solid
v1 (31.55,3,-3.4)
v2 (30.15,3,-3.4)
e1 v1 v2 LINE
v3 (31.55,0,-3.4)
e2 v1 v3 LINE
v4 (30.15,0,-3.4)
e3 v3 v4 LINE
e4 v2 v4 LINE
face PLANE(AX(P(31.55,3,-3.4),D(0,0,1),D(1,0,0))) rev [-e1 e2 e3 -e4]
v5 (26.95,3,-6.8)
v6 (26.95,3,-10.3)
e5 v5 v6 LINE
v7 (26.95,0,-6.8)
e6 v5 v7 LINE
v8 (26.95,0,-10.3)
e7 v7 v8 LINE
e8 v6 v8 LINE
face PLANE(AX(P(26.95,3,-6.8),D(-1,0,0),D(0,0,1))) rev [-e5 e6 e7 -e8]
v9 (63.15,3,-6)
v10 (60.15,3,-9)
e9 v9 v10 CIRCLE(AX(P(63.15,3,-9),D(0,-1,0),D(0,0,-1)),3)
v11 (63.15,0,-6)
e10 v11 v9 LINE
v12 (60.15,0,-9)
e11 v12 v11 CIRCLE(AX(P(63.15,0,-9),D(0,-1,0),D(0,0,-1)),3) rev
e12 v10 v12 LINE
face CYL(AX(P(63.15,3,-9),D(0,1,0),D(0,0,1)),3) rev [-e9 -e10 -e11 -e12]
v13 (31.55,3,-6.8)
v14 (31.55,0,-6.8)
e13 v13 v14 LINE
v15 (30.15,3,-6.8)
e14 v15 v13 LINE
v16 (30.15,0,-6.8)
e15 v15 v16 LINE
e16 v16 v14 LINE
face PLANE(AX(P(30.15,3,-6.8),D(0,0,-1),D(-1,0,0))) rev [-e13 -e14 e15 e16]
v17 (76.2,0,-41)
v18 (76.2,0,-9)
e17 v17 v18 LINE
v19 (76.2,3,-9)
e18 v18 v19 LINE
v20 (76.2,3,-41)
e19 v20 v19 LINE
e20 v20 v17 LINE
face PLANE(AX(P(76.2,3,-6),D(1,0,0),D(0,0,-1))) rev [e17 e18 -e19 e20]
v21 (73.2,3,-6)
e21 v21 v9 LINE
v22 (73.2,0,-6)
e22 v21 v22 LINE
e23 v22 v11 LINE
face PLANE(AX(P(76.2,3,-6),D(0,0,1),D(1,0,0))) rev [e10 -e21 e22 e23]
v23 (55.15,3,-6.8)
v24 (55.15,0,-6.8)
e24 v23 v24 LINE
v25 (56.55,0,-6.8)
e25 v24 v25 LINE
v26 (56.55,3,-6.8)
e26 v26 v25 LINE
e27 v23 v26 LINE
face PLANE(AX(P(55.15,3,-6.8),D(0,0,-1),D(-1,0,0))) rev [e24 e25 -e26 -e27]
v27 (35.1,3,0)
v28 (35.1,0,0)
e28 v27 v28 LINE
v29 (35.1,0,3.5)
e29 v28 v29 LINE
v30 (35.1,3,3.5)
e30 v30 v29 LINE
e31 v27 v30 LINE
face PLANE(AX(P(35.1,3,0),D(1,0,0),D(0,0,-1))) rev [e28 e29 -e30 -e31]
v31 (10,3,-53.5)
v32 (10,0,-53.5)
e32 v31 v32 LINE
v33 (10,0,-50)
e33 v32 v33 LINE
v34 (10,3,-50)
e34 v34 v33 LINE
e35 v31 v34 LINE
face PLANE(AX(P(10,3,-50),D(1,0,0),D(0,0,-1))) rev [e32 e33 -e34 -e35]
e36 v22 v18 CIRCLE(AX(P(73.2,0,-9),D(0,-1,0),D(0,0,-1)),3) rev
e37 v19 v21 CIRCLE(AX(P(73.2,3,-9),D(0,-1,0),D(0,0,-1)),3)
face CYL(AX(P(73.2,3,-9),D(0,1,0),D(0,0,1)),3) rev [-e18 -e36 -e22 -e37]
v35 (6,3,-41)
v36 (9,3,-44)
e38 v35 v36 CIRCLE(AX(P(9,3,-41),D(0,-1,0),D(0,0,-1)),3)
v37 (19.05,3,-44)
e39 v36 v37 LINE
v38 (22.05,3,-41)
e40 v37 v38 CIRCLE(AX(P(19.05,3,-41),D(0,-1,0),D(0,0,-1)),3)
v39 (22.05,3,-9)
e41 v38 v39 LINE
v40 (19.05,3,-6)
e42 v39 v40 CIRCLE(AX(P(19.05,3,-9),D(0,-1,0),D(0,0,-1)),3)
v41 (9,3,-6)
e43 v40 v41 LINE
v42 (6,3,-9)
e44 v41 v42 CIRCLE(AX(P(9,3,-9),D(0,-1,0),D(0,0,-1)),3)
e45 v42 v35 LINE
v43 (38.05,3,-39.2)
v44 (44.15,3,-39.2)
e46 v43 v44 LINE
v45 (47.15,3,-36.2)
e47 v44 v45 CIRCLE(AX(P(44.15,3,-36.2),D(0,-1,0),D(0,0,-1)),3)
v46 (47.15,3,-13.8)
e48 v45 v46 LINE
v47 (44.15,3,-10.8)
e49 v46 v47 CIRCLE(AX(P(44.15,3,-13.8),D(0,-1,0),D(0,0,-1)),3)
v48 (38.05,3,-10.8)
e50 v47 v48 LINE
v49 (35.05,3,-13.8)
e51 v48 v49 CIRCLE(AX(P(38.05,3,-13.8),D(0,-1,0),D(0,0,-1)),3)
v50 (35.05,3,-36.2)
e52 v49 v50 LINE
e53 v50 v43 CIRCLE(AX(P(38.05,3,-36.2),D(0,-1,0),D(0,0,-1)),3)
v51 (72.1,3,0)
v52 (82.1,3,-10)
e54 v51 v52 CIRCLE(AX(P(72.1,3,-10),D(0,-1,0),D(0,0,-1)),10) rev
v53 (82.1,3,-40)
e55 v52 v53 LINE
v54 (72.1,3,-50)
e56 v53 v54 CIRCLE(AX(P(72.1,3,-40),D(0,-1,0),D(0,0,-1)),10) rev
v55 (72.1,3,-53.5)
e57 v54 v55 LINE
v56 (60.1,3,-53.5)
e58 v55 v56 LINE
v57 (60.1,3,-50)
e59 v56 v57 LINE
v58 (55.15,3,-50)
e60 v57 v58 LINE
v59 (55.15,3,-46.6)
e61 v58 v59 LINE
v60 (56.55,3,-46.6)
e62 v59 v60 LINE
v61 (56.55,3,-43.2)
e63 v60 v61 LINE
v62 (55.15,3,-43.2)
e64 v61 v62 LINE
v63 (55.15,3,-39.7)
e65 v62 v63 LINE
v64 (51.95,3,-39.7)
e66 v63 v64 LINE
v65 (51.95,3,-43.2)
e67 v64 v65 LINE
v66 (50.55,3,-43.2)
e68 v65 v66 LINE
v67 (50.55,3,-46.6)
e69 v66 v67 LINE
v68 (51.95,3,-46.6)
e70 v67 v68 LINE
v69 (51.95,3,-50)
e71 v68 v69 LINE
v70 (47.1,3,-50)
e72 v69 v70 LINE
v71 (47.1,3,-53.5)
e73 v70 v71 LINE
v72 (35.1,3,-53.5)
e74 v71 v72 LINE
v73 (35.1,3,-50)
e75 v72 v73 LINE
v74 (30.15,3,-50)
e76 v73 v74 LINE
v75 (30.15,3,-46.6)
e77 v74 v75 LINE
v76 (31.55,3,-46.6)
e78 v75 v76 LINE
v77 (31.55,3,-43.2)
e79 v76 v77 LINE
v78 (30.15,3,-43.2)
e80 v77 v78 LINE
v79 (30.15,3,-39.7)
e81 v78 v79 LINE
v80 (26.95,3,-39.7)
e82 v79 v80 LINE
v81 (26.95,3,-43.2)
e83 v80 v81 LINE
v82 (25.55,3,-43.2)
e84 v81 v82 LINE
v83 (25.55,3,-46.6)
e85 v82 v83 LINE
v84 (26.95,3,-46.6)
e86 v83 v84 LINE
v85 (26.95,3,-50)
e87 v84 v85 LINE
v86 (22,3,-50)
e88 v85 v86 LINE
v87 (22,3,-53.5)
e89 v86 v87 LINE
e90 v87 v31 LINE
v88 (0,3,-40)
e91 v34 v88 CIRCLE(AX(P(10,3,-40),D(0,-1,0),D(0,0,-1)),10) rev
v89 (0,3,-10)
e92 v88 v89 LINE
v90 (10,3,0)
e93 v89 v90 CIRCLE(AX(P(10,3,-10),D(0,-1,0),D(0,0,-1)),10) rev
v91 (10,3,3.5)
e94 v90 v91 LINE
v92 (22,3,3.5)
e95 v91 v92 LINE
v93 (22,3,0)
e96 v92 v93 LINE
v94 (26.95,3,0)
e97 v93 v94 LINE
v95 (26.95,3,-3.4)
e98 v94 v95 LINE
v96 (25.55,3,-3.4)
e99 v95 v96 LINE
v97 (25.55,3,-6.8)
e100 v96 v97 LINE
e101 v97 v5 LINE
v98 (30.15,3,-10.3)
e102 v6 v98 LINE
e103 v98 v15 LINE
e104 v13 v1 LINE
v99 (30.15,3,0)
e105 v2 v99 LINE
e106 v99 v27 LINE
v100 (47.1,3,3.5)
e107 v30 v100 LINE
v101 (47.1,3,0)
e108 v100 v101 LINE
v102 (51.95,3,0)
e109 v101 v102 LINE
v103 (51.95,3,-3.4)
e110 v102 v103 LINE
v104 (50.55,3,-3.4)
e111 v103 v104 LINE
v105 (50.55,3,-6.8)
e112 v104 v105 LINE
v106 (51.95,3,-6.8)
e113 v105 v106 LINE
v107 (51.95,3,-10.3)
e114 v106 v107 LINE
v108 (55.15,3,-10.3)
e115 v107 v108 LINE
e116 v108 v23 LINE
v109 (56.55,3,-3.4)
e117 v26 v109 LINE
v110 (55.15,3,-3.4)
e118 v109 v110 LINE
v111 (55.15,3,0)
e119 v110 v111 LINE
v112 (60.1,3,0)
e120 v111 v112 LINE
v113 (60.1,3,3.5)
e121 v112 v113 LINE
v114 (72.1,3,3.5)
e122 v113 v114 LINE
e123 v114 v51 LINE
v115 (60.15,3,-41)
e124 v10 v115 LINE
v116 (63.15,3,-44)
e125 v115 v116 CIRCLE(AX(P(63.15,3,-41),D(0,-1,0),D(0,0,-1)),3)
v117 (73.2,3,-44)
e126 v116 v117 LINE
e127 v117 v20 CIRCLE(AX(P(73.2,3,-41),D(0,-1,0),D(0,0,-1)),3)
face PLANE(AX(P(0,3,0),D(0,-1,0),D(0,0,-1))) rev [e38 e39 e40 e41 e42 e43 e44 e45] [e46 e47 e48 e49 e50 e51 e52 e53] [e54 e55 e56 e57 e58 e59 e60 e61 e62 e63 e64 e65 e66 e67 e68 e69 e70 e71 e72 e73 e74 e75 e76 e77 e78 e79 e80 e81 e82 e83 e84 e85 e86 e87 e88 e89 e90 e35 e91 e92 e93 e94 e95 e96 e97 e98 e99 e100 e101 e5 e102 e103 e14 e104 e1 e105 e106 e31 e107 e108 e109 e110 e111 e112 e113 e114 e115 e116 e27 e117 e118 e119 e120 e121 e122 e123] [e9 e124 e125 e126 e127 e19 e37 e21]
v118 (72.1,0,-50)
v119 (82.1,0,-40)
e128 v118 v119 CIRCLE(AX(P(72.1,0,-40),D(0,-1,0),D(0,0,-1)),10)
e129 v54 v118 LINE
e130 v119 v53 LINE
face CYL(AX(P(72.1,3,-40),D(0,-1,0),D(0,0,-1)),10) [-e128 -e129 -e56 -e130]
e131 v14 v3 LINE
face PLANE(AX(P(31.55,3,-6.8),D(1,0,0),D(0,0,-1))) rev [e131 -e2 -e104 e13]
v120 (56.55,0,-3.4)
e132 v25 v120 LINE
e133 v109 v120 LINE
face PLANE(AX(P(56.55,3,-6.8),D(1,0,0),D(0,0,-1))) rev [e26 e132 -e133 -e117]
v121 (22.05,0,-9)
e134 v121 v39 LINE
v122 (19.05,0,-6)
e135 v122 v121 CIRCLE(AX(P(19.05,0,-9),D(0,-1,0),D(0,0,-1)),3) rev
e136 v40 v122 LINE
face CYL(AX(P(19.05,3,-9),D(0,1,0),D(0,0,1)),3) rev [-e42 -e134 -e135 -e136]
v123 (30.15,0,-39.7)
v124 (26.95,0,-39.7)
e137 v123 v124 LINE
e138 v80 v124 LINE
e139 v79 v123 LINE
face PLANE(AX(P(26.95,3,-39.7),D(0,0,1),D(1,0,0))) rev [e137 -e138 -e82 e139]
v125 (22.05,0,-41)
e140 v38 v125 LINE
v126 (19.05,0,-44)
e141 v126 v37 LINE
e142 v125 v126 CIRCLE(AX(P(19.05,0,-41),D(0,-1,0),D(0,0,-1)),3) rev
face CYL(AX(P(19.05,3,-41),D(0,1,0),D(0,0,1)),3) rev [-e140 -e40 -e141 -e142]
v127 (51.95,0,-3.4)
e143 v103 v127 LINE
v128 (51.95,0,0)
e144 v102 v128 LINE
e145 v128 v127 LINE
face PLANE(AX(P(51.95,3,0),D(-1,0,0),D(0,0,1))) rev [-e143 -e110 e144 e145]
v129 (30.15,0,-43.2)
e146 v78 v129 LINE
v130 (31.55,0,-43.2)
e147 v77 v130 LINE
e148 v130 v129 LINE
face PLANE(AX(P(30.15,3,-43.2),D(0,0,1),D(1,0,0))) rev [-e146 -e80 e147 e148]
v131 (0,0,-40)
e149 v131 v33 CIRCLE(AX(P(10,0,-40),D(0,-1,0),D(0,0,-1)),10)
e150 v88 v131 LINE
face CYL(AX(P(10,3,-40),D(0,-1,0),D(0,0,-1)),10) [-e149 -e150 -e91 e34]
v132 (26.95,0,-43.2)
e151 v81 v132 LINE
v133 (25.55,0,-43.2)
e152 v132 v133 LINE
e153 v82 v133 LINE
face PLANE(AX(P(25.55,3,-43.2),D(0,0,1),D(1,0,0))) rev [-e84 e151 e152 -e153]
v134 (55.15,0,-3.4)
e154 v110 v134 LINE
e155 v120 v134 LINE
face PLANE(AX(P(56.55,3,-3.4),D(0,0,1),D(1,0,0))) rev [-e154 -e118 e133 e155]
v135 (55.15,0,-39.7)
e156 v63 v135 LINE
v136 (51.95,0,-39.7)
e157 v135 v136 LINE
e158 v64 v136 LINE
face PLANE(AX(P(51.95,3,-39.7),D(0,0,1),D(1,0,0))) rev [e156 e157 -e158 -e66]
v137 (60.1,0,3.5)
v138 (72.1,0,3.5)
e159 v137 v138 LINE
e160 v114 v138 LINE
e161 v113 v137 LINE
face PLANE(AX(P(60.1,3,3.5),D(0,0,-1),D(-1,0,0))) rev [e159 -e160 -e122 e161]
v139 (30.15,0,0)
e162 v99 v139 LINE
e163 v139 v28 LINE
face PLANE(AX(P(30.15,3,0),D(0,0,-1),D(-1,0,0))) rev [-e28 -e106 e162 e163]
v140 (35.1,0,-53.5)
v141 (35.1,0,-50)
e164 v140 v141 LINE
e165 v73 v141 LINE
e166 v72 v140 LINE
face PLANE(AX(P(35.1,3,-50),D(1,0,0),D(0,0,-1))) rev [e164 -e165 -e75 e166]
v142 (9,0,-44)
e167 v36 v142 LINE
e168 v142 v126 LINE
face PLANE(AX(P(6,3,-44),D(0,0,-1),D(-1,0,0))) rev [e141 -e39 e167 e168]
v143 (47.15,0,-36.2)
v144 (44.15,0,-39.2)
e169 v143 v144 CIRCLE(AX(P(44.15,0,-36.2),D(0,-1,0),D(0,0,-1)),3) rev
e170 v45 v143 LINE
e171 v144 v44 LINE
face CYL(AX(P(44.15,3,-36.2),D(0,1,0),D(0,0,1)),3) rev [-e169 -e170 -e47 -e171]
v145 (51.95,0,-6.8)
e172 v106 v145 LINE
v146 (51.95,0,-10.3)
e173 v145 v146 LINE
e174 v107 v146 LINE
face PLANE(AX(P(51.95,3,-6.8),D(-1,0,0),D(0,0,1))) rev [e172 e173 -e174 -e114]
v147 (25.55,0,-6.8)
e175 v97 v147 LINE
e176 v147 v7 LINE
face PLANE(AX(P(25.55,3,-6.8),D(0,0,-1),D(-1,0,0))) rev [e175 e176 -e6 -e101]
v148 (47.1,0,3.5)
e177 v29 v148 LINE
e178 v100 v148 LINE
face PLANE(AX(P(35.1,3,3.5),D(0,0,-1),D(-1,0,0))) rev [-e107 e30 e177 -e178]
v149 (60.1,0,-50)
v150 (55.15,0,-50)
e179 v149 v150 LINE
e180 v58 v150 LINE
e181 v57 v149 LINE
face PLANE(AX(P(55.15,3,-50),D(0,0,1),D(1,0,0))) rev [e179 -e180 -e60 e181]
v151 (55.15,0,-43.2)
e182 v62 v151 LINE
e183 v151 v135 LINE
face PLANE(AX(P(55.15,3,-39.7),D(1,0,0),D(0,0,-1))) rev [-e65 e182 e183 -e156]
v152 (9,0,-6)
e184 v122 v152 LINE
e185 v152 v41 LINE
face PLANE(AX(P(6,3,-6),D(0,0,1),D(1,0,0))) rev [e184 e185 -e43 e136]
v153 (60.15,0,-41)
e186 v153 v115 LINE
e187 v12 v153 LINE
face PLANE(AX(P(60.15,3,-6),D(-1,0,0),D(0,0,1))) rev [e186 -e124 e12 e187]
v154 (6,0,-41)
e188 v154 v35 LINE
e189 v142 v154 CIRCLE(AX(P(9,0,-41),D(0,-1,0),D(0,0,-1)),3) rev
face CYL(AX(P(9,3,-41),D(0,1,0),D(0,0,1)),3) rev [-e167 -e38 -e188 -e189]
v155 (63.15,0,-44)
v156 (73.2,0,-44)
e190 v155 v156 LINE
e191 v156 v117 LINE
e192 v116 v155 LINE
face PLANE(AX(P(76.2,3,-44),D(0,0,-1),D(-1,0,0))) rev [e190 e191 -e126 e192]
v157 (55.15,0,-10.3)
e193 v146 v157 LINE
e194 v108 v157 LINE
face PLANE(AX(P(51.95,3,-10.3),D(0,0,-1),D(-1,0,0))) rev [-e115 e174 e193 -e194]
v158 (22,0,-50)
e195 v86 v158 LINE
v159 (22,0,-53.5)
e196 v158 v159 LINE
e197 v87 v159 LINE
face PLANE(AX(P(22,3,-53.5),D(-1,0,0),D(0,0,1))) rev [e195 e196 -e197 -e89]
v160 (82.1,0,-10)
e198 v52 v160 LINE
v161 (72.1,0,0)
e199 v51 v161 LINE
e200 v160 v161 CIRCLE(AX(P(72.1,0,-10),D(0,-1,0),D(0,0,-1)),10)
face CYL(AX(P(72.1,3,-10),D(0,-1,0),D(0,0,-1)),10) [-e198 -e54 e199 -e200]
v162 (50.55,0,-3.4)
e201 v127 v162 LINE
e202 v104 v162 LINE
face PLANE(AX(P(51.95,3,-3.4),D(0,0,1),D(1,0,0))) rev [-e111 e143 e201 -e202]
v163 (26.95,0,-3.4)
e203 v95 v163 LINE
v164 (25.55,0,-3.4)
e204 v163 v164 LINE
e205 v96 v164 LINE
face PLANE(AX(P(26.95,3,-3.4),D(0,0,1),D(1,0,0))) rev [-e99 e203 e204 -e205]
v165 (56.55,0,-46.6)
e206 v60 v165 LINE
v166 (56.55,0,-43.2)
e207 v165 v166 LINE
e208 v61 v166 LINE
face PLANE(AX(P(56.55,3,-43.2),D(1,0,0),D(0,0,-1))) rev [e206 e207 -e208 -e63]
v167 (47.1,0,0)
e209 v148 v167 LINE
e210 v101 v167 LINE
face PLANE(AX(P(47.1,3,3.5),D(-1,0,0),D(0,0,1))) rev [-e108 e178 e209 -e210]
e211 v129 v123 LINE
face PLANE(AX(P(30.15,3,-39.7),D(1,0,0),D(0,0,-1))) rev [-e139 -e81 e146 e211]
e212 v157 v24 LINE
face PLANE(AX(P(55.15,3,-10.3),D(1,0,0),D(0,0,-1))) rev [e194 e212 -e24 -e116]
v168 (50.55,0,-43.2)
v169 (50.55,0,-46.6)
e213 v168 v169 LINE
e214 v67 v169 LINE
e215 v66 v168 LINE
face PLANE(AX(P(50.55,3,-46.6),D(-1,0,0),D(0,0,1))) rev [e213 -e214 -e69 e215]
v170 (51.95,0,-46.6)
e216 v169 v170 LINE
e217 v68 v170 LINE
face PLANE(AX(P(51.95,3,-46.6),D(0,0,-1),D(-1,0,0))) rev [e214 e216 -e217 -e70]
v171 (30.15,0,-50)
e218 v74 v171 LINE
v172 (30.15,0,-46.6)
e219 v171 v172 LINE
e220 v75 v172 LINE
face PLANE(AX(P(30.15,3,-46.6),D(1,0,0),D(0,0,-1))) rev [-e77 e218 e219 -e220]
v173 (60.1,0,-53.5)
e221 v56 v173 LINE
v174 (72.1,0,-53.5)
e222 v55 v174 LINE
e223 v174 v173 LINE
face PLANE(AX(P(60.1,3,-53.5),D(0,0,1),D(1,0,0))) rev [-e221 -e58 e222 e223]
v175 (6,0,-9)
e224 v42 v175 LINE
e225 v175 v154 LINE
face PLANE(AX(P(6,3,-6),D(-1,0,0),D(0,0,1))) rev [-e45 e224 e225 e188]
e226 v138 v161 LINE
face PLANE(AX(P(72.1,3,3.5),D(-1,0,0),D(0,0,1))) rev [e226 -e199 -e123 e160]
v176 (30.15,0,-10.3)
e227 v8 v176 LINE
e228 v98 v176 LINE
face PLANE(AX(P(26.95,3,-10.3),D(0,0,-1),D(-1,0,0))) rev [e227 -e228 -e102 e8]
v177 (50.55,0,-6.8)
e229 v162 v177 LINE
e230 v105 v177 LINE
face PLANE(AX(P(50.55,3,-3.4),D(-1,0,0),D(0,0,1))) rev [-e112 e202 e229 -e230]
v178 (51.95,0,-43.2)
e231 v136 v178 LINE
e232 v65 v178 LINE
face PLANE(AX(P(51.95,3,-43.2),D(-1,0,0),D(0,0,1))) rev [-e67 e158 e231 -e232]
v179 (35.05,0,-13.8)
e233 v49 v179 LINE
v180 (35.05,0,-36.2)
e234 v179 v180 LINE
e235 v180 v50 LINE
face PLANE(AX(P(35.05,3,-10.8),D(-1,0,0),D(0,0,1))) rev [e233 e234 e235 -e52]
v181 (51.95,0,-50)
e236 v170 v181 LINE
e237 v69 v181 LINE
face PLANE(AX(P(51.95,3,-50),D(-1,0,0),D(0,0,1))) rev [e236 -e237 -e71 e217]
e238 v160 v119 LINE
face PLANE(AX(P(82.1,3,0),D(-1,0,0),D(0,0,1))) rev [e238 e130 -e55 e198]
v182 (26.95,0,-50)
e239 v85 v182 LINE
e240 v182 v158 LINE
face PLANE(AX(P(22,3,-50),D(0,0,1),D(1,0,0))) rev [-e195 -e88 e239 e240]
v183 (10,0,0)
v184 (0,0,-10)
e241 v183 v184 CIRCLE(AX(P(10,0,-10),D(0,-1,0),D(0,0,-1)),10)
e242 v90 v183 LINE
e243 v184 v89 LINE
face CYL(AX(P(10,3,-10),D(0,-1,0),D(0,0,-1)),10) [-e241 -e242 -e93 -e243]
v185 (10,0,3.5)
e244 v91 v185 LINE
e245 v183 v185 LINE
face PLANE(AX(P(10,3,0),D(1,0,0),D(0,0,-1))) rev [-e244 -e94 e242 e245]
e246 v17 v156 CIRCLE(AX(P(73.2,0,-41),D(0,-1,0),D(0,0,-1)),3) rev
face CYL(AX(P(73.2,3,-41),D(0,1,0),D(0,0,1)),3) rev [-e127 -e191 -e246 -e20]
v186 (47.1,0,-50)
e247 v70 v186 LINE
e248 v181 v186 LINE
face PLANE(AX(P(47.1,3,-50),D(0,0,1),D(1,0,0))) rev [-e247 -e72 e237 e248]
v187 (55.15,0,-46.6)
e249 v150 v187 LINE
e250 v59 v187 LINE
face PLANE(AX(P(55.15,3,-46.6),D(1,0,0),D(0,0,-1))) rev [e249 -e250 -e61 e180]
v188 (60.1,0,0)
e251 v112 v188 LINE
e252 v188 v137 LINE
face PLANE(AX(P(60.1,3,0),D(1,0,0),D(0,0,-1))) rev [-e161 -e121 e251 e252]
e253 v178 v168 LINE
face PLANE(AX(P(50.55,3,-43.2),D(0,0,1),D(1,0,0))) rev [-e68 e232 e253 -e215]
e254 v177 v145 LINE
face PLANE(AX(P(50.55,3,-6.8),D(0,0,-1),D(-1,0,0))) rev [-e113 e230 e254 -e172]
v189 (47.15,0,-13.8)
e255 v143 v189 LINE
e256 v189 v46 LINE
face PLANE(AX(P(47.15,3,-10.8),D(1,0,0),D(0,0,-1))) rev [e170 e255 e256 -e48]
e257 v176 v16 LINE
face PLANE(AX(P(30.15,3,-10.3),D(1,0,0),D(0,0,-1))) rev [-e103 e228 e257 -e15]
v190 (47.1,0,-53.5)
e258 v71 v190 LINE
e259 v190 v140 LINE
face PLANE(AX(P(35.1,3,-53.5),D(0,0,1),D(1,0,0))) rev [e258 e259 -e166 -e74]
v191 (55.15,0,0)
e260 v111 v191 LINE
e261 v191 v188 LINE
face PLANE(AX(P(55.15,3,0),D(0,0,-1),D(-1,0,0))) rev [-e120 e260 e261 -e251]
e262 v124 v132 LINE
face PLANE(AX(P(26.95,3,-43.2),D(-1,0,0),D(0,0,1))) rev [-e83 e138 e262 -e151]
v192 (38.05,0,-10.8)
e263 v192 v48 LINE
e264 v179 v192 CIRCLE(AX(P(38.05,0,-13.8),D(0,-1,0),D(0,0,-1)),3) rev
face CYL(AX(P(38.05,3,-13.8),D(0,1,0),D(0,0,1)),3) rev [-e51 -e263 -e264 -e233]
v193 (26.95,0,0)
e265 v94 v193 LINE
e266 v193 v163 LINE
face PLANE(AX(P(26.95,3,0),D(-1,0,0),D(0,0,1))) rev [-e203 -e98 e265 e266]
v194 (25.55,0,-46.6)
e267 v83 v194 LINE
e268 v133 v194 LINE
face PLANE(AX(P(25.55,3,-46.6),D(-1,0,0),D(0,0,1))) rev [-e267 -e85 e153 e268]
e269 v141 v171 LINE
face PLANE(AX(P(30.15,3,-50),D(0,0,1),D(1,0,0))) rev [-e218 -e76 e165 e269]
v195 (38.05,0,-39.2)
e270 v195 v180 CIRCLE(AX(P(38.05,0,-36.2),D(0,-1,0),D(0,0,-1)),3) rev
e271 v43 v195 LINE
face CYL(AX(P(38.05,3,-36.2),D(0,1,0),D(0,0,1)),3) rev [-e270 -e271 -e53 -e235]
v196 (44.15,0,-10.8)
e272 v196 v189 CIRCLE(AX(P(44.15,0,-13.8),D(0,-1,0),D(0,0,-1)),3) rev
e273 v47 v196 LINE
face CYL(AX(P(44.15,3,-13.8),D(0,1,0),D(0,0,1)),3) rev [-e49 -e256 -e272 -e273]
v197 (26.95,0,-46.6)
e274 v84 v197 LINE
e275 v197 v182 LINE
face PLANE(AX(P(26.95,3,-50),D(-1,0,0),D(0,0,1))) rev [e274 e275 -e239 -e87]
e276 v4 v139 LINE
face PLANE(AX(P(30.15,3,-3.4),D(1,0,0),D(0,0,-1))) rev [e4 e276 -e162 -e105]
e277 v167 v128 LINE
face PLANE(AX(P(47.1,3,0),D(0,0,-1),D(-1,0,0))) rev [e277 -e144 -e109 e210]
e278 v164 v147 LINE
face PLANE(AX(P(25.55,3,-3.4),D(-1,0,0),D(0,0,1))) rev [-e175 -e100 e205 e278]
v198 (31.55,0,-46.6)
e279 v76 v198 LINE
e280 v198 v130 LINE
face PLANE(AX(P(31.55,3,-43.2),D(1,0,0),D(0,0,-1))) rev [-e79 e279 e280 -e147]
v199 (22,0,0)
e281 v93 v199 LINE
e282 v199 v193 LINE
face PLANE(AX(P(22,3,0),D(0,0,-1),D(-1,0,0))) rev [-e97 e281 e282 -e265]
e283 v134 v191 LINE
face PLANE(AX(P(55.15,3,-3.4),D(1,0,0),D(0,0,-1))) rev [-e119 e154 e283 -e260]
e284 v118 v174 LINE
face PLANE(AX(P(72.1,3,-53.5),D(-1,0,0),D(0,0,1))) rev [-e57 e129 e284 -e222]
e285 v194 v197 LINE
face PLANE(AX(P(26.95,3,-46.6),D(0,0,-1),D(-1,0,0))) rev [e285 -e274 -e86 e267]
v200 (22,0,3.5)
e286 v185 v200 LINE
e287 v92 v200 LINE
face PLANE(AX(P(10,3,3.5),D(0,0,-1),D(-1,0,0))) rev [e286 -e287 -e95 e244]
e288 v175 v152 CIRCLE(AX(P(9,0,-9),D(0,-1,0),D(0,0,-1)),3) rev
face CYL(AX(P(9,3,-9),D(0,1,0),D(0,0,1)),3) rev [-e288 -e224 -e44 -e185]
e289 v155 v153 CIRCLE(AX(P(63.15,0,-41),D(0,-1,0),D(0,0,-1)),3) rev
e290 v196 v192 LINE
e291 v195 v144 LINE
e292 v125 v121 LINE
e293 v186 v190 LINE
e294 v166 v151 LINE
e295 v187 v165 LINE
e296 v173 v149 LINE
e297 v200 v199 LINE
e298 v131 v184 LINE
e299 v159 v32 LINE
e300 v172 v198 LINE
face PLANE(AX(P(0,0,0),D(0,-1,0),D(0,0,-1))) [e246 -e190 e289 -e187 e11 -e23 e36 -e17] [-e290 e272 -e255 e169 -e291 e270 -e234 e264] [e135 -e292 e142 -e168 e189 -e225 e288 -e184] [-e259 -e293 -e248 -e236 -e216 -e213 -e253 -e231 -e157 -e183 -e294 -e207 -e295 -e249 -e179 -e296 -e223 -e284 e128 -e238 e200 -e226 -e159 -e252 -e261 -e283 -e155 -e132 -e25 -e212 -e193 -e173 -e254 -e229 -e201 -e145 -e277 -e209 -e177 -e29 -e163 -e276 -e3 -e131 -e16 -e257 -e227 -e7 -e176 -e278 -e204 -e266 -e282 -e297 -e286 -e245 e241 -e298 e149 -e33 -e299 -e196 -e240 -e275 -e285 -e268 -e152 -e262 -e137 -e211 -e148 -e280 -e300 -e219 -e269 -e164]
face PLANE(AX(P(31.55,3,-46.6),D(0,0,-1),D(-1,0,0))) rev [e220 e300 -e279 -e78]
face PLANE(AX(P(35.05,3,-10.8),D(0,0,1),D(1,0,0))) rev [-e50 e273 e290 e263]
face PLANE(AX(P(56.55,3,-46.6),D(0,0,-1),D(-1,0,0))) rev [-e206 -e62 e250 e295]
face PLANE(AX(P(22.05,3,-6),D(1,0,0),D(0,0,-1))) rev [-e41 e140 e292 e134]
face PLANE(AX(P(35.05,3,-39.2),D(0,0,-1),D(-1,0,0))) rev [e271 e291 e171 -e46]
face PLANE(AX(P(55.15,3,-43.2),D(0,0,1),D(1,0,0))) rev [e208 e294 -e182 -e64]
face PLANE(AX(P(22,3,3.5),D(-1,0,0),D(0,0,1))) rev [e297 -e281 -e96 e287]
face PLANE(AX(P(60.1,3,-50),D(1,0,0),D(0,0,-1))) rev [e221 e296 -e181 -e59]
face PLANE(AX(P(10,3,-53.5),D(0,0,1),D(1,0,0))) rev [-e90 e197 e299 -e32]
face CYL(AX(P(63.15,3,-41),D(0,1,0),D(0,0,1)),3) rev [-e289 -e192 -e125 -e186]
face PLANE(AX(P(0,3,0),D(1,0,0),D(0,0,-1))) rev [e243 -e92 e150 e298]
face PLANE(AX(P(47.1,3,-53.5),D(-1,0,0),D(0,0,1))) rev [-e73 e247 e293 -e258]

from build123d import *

# Parameters (mm, degrees)
EXTRUDE_1_DEPTH     = 3
FILLET_1_R          = 10
SKETCH_2_W          = 12.1
SKETCH_2_H          = 28.4
SKETCH_2_W_2        = 16.05
SKETCH_2_H_2        = 38
CUT_EXTRUDE_1_DEPTH = 99.039073843
FILLET_2_R          = 3


with BuildPart() as part:
    # 草图1 → 凸台-拉伸1 (new body)
    with BuildSketch(Plane(origin=(0, 0, 0), x_dir=(1, 0, 0), z_dir=(0, 1, 0))):
        Polygon((10, 0), (10, -3.5), (22, -3.5), (22, 0), (26.95, 0), (26.95, 3.4), (25.55, 3.4), (25.55, 6.8), (26.95, 6.8), (26.95, 10.3), (30.15, 10.3), (30.15, 6.8), (31.55, 6.8), (31.55, 3.4), (30.15, 3.4), (30.15, 0), (35.1, 0), (35.1, -3.5), (47.1, -3.5), (47.1, 0), (51.95, 0), (51.95, 3.4), (50.55, 3.4), (50.55, 6.8), (51.95, 6.8), (51.95, 10.3), (55.15, 10.3), (55.15, 6.8), (56.55, 6.8), (56.55, 3.4), (55.15, 3.4), (55.15, 0), (60.1, 0), (60.1, -3.5), (72.1, -3.5), (72.1, 0), (82.1, 0), (82.1, 50), (72.1, 50), (72.1, 53.5), (60.1, 53.5), (60.1, 50), (55.15, 50), (55.15, 46.6), (56.55, 46.6), (56.55, 43.2), (55.15, 43.2), (55.15, 39.7), (51.95, 39.7), (51.95, 43.2), (50.55, 43.2), (50.55, 46.6), (51.95, 46.6), (51.95, 50), (47.1, 50), (47.1, 53.5), (35.1, 53.5), (35.1, 50), (30.15, 50), (30.15, 46.6), (31.55, 46.6), (31.55, 43.2), (30.15, 43.2), (30.15, 39.7), (26.95, 39.7), (26.95, 43.2), (25.55, 43.2), (25.55, 46.6), (26.95, 46.6), (26.95, 50), (22, 50), (22, 53.5), (10, 53.5), (10, 50), (0, 50), (0, 0), align=None)
    extrude(amount=EXTRUDE_1_DEPTH)

    # 圆角1
    fillet_1_edges = [part.edges().sort_by_distance(p)[0] for p in [
        (0, 1.5, -50),
        (82.1, 1.5, -50),
        (82.1, 1.5, 0),
        (0, 1.5, 0),
    ]]
    fillet(fillet_1_edges, radius=FILLET_1_R - 0.0001)  # a hair under: the kernel refuses the full size

    # 草图2 → 切除-拉伸1 (cut, through all)
    with BuildSketch(Plane.XZ):
        with Locations((41.1, -25)):
            Rectangle(SKETCH_2_W, SKETCH_2_H)
        with Locations((14.025, -25)):
            Rectangle(SKETCH_2_W_2, SKETCH_2_H_2)
        with Locations((68.175, -25)):
            Rectangle(SKETCH_2_W_2, SKETCH_2_H_2)
    extrude(amount=-CUT_EXTRUDE_1_DEPTH, mode=Mode.SUBTRACT)

    # 圆角2
    fillet_2_edges = [part.edges().sort_by_distance(p)[0] for p in [
        (60.15, 1.5, -6),
        (76.2, 1.5, -6),
        (76.2, 1.5, -44),
        (60.15, 1.5, -44),
        (6, 1.5, -44),
        (6, 1.5, -6),
        (22.05, 1.5, -6),
        (22.05, 1.5, -44),
        (35.05, 1.5, -39.2),
        (35.05, 1.5, -10.8),
        (47.15, 1.5, -10.8),
        (47.15, 1.5, -39.2),
    ]]
    fillet(fillet_2_edges, radius=FILLET_2_R)


solid = part.part
